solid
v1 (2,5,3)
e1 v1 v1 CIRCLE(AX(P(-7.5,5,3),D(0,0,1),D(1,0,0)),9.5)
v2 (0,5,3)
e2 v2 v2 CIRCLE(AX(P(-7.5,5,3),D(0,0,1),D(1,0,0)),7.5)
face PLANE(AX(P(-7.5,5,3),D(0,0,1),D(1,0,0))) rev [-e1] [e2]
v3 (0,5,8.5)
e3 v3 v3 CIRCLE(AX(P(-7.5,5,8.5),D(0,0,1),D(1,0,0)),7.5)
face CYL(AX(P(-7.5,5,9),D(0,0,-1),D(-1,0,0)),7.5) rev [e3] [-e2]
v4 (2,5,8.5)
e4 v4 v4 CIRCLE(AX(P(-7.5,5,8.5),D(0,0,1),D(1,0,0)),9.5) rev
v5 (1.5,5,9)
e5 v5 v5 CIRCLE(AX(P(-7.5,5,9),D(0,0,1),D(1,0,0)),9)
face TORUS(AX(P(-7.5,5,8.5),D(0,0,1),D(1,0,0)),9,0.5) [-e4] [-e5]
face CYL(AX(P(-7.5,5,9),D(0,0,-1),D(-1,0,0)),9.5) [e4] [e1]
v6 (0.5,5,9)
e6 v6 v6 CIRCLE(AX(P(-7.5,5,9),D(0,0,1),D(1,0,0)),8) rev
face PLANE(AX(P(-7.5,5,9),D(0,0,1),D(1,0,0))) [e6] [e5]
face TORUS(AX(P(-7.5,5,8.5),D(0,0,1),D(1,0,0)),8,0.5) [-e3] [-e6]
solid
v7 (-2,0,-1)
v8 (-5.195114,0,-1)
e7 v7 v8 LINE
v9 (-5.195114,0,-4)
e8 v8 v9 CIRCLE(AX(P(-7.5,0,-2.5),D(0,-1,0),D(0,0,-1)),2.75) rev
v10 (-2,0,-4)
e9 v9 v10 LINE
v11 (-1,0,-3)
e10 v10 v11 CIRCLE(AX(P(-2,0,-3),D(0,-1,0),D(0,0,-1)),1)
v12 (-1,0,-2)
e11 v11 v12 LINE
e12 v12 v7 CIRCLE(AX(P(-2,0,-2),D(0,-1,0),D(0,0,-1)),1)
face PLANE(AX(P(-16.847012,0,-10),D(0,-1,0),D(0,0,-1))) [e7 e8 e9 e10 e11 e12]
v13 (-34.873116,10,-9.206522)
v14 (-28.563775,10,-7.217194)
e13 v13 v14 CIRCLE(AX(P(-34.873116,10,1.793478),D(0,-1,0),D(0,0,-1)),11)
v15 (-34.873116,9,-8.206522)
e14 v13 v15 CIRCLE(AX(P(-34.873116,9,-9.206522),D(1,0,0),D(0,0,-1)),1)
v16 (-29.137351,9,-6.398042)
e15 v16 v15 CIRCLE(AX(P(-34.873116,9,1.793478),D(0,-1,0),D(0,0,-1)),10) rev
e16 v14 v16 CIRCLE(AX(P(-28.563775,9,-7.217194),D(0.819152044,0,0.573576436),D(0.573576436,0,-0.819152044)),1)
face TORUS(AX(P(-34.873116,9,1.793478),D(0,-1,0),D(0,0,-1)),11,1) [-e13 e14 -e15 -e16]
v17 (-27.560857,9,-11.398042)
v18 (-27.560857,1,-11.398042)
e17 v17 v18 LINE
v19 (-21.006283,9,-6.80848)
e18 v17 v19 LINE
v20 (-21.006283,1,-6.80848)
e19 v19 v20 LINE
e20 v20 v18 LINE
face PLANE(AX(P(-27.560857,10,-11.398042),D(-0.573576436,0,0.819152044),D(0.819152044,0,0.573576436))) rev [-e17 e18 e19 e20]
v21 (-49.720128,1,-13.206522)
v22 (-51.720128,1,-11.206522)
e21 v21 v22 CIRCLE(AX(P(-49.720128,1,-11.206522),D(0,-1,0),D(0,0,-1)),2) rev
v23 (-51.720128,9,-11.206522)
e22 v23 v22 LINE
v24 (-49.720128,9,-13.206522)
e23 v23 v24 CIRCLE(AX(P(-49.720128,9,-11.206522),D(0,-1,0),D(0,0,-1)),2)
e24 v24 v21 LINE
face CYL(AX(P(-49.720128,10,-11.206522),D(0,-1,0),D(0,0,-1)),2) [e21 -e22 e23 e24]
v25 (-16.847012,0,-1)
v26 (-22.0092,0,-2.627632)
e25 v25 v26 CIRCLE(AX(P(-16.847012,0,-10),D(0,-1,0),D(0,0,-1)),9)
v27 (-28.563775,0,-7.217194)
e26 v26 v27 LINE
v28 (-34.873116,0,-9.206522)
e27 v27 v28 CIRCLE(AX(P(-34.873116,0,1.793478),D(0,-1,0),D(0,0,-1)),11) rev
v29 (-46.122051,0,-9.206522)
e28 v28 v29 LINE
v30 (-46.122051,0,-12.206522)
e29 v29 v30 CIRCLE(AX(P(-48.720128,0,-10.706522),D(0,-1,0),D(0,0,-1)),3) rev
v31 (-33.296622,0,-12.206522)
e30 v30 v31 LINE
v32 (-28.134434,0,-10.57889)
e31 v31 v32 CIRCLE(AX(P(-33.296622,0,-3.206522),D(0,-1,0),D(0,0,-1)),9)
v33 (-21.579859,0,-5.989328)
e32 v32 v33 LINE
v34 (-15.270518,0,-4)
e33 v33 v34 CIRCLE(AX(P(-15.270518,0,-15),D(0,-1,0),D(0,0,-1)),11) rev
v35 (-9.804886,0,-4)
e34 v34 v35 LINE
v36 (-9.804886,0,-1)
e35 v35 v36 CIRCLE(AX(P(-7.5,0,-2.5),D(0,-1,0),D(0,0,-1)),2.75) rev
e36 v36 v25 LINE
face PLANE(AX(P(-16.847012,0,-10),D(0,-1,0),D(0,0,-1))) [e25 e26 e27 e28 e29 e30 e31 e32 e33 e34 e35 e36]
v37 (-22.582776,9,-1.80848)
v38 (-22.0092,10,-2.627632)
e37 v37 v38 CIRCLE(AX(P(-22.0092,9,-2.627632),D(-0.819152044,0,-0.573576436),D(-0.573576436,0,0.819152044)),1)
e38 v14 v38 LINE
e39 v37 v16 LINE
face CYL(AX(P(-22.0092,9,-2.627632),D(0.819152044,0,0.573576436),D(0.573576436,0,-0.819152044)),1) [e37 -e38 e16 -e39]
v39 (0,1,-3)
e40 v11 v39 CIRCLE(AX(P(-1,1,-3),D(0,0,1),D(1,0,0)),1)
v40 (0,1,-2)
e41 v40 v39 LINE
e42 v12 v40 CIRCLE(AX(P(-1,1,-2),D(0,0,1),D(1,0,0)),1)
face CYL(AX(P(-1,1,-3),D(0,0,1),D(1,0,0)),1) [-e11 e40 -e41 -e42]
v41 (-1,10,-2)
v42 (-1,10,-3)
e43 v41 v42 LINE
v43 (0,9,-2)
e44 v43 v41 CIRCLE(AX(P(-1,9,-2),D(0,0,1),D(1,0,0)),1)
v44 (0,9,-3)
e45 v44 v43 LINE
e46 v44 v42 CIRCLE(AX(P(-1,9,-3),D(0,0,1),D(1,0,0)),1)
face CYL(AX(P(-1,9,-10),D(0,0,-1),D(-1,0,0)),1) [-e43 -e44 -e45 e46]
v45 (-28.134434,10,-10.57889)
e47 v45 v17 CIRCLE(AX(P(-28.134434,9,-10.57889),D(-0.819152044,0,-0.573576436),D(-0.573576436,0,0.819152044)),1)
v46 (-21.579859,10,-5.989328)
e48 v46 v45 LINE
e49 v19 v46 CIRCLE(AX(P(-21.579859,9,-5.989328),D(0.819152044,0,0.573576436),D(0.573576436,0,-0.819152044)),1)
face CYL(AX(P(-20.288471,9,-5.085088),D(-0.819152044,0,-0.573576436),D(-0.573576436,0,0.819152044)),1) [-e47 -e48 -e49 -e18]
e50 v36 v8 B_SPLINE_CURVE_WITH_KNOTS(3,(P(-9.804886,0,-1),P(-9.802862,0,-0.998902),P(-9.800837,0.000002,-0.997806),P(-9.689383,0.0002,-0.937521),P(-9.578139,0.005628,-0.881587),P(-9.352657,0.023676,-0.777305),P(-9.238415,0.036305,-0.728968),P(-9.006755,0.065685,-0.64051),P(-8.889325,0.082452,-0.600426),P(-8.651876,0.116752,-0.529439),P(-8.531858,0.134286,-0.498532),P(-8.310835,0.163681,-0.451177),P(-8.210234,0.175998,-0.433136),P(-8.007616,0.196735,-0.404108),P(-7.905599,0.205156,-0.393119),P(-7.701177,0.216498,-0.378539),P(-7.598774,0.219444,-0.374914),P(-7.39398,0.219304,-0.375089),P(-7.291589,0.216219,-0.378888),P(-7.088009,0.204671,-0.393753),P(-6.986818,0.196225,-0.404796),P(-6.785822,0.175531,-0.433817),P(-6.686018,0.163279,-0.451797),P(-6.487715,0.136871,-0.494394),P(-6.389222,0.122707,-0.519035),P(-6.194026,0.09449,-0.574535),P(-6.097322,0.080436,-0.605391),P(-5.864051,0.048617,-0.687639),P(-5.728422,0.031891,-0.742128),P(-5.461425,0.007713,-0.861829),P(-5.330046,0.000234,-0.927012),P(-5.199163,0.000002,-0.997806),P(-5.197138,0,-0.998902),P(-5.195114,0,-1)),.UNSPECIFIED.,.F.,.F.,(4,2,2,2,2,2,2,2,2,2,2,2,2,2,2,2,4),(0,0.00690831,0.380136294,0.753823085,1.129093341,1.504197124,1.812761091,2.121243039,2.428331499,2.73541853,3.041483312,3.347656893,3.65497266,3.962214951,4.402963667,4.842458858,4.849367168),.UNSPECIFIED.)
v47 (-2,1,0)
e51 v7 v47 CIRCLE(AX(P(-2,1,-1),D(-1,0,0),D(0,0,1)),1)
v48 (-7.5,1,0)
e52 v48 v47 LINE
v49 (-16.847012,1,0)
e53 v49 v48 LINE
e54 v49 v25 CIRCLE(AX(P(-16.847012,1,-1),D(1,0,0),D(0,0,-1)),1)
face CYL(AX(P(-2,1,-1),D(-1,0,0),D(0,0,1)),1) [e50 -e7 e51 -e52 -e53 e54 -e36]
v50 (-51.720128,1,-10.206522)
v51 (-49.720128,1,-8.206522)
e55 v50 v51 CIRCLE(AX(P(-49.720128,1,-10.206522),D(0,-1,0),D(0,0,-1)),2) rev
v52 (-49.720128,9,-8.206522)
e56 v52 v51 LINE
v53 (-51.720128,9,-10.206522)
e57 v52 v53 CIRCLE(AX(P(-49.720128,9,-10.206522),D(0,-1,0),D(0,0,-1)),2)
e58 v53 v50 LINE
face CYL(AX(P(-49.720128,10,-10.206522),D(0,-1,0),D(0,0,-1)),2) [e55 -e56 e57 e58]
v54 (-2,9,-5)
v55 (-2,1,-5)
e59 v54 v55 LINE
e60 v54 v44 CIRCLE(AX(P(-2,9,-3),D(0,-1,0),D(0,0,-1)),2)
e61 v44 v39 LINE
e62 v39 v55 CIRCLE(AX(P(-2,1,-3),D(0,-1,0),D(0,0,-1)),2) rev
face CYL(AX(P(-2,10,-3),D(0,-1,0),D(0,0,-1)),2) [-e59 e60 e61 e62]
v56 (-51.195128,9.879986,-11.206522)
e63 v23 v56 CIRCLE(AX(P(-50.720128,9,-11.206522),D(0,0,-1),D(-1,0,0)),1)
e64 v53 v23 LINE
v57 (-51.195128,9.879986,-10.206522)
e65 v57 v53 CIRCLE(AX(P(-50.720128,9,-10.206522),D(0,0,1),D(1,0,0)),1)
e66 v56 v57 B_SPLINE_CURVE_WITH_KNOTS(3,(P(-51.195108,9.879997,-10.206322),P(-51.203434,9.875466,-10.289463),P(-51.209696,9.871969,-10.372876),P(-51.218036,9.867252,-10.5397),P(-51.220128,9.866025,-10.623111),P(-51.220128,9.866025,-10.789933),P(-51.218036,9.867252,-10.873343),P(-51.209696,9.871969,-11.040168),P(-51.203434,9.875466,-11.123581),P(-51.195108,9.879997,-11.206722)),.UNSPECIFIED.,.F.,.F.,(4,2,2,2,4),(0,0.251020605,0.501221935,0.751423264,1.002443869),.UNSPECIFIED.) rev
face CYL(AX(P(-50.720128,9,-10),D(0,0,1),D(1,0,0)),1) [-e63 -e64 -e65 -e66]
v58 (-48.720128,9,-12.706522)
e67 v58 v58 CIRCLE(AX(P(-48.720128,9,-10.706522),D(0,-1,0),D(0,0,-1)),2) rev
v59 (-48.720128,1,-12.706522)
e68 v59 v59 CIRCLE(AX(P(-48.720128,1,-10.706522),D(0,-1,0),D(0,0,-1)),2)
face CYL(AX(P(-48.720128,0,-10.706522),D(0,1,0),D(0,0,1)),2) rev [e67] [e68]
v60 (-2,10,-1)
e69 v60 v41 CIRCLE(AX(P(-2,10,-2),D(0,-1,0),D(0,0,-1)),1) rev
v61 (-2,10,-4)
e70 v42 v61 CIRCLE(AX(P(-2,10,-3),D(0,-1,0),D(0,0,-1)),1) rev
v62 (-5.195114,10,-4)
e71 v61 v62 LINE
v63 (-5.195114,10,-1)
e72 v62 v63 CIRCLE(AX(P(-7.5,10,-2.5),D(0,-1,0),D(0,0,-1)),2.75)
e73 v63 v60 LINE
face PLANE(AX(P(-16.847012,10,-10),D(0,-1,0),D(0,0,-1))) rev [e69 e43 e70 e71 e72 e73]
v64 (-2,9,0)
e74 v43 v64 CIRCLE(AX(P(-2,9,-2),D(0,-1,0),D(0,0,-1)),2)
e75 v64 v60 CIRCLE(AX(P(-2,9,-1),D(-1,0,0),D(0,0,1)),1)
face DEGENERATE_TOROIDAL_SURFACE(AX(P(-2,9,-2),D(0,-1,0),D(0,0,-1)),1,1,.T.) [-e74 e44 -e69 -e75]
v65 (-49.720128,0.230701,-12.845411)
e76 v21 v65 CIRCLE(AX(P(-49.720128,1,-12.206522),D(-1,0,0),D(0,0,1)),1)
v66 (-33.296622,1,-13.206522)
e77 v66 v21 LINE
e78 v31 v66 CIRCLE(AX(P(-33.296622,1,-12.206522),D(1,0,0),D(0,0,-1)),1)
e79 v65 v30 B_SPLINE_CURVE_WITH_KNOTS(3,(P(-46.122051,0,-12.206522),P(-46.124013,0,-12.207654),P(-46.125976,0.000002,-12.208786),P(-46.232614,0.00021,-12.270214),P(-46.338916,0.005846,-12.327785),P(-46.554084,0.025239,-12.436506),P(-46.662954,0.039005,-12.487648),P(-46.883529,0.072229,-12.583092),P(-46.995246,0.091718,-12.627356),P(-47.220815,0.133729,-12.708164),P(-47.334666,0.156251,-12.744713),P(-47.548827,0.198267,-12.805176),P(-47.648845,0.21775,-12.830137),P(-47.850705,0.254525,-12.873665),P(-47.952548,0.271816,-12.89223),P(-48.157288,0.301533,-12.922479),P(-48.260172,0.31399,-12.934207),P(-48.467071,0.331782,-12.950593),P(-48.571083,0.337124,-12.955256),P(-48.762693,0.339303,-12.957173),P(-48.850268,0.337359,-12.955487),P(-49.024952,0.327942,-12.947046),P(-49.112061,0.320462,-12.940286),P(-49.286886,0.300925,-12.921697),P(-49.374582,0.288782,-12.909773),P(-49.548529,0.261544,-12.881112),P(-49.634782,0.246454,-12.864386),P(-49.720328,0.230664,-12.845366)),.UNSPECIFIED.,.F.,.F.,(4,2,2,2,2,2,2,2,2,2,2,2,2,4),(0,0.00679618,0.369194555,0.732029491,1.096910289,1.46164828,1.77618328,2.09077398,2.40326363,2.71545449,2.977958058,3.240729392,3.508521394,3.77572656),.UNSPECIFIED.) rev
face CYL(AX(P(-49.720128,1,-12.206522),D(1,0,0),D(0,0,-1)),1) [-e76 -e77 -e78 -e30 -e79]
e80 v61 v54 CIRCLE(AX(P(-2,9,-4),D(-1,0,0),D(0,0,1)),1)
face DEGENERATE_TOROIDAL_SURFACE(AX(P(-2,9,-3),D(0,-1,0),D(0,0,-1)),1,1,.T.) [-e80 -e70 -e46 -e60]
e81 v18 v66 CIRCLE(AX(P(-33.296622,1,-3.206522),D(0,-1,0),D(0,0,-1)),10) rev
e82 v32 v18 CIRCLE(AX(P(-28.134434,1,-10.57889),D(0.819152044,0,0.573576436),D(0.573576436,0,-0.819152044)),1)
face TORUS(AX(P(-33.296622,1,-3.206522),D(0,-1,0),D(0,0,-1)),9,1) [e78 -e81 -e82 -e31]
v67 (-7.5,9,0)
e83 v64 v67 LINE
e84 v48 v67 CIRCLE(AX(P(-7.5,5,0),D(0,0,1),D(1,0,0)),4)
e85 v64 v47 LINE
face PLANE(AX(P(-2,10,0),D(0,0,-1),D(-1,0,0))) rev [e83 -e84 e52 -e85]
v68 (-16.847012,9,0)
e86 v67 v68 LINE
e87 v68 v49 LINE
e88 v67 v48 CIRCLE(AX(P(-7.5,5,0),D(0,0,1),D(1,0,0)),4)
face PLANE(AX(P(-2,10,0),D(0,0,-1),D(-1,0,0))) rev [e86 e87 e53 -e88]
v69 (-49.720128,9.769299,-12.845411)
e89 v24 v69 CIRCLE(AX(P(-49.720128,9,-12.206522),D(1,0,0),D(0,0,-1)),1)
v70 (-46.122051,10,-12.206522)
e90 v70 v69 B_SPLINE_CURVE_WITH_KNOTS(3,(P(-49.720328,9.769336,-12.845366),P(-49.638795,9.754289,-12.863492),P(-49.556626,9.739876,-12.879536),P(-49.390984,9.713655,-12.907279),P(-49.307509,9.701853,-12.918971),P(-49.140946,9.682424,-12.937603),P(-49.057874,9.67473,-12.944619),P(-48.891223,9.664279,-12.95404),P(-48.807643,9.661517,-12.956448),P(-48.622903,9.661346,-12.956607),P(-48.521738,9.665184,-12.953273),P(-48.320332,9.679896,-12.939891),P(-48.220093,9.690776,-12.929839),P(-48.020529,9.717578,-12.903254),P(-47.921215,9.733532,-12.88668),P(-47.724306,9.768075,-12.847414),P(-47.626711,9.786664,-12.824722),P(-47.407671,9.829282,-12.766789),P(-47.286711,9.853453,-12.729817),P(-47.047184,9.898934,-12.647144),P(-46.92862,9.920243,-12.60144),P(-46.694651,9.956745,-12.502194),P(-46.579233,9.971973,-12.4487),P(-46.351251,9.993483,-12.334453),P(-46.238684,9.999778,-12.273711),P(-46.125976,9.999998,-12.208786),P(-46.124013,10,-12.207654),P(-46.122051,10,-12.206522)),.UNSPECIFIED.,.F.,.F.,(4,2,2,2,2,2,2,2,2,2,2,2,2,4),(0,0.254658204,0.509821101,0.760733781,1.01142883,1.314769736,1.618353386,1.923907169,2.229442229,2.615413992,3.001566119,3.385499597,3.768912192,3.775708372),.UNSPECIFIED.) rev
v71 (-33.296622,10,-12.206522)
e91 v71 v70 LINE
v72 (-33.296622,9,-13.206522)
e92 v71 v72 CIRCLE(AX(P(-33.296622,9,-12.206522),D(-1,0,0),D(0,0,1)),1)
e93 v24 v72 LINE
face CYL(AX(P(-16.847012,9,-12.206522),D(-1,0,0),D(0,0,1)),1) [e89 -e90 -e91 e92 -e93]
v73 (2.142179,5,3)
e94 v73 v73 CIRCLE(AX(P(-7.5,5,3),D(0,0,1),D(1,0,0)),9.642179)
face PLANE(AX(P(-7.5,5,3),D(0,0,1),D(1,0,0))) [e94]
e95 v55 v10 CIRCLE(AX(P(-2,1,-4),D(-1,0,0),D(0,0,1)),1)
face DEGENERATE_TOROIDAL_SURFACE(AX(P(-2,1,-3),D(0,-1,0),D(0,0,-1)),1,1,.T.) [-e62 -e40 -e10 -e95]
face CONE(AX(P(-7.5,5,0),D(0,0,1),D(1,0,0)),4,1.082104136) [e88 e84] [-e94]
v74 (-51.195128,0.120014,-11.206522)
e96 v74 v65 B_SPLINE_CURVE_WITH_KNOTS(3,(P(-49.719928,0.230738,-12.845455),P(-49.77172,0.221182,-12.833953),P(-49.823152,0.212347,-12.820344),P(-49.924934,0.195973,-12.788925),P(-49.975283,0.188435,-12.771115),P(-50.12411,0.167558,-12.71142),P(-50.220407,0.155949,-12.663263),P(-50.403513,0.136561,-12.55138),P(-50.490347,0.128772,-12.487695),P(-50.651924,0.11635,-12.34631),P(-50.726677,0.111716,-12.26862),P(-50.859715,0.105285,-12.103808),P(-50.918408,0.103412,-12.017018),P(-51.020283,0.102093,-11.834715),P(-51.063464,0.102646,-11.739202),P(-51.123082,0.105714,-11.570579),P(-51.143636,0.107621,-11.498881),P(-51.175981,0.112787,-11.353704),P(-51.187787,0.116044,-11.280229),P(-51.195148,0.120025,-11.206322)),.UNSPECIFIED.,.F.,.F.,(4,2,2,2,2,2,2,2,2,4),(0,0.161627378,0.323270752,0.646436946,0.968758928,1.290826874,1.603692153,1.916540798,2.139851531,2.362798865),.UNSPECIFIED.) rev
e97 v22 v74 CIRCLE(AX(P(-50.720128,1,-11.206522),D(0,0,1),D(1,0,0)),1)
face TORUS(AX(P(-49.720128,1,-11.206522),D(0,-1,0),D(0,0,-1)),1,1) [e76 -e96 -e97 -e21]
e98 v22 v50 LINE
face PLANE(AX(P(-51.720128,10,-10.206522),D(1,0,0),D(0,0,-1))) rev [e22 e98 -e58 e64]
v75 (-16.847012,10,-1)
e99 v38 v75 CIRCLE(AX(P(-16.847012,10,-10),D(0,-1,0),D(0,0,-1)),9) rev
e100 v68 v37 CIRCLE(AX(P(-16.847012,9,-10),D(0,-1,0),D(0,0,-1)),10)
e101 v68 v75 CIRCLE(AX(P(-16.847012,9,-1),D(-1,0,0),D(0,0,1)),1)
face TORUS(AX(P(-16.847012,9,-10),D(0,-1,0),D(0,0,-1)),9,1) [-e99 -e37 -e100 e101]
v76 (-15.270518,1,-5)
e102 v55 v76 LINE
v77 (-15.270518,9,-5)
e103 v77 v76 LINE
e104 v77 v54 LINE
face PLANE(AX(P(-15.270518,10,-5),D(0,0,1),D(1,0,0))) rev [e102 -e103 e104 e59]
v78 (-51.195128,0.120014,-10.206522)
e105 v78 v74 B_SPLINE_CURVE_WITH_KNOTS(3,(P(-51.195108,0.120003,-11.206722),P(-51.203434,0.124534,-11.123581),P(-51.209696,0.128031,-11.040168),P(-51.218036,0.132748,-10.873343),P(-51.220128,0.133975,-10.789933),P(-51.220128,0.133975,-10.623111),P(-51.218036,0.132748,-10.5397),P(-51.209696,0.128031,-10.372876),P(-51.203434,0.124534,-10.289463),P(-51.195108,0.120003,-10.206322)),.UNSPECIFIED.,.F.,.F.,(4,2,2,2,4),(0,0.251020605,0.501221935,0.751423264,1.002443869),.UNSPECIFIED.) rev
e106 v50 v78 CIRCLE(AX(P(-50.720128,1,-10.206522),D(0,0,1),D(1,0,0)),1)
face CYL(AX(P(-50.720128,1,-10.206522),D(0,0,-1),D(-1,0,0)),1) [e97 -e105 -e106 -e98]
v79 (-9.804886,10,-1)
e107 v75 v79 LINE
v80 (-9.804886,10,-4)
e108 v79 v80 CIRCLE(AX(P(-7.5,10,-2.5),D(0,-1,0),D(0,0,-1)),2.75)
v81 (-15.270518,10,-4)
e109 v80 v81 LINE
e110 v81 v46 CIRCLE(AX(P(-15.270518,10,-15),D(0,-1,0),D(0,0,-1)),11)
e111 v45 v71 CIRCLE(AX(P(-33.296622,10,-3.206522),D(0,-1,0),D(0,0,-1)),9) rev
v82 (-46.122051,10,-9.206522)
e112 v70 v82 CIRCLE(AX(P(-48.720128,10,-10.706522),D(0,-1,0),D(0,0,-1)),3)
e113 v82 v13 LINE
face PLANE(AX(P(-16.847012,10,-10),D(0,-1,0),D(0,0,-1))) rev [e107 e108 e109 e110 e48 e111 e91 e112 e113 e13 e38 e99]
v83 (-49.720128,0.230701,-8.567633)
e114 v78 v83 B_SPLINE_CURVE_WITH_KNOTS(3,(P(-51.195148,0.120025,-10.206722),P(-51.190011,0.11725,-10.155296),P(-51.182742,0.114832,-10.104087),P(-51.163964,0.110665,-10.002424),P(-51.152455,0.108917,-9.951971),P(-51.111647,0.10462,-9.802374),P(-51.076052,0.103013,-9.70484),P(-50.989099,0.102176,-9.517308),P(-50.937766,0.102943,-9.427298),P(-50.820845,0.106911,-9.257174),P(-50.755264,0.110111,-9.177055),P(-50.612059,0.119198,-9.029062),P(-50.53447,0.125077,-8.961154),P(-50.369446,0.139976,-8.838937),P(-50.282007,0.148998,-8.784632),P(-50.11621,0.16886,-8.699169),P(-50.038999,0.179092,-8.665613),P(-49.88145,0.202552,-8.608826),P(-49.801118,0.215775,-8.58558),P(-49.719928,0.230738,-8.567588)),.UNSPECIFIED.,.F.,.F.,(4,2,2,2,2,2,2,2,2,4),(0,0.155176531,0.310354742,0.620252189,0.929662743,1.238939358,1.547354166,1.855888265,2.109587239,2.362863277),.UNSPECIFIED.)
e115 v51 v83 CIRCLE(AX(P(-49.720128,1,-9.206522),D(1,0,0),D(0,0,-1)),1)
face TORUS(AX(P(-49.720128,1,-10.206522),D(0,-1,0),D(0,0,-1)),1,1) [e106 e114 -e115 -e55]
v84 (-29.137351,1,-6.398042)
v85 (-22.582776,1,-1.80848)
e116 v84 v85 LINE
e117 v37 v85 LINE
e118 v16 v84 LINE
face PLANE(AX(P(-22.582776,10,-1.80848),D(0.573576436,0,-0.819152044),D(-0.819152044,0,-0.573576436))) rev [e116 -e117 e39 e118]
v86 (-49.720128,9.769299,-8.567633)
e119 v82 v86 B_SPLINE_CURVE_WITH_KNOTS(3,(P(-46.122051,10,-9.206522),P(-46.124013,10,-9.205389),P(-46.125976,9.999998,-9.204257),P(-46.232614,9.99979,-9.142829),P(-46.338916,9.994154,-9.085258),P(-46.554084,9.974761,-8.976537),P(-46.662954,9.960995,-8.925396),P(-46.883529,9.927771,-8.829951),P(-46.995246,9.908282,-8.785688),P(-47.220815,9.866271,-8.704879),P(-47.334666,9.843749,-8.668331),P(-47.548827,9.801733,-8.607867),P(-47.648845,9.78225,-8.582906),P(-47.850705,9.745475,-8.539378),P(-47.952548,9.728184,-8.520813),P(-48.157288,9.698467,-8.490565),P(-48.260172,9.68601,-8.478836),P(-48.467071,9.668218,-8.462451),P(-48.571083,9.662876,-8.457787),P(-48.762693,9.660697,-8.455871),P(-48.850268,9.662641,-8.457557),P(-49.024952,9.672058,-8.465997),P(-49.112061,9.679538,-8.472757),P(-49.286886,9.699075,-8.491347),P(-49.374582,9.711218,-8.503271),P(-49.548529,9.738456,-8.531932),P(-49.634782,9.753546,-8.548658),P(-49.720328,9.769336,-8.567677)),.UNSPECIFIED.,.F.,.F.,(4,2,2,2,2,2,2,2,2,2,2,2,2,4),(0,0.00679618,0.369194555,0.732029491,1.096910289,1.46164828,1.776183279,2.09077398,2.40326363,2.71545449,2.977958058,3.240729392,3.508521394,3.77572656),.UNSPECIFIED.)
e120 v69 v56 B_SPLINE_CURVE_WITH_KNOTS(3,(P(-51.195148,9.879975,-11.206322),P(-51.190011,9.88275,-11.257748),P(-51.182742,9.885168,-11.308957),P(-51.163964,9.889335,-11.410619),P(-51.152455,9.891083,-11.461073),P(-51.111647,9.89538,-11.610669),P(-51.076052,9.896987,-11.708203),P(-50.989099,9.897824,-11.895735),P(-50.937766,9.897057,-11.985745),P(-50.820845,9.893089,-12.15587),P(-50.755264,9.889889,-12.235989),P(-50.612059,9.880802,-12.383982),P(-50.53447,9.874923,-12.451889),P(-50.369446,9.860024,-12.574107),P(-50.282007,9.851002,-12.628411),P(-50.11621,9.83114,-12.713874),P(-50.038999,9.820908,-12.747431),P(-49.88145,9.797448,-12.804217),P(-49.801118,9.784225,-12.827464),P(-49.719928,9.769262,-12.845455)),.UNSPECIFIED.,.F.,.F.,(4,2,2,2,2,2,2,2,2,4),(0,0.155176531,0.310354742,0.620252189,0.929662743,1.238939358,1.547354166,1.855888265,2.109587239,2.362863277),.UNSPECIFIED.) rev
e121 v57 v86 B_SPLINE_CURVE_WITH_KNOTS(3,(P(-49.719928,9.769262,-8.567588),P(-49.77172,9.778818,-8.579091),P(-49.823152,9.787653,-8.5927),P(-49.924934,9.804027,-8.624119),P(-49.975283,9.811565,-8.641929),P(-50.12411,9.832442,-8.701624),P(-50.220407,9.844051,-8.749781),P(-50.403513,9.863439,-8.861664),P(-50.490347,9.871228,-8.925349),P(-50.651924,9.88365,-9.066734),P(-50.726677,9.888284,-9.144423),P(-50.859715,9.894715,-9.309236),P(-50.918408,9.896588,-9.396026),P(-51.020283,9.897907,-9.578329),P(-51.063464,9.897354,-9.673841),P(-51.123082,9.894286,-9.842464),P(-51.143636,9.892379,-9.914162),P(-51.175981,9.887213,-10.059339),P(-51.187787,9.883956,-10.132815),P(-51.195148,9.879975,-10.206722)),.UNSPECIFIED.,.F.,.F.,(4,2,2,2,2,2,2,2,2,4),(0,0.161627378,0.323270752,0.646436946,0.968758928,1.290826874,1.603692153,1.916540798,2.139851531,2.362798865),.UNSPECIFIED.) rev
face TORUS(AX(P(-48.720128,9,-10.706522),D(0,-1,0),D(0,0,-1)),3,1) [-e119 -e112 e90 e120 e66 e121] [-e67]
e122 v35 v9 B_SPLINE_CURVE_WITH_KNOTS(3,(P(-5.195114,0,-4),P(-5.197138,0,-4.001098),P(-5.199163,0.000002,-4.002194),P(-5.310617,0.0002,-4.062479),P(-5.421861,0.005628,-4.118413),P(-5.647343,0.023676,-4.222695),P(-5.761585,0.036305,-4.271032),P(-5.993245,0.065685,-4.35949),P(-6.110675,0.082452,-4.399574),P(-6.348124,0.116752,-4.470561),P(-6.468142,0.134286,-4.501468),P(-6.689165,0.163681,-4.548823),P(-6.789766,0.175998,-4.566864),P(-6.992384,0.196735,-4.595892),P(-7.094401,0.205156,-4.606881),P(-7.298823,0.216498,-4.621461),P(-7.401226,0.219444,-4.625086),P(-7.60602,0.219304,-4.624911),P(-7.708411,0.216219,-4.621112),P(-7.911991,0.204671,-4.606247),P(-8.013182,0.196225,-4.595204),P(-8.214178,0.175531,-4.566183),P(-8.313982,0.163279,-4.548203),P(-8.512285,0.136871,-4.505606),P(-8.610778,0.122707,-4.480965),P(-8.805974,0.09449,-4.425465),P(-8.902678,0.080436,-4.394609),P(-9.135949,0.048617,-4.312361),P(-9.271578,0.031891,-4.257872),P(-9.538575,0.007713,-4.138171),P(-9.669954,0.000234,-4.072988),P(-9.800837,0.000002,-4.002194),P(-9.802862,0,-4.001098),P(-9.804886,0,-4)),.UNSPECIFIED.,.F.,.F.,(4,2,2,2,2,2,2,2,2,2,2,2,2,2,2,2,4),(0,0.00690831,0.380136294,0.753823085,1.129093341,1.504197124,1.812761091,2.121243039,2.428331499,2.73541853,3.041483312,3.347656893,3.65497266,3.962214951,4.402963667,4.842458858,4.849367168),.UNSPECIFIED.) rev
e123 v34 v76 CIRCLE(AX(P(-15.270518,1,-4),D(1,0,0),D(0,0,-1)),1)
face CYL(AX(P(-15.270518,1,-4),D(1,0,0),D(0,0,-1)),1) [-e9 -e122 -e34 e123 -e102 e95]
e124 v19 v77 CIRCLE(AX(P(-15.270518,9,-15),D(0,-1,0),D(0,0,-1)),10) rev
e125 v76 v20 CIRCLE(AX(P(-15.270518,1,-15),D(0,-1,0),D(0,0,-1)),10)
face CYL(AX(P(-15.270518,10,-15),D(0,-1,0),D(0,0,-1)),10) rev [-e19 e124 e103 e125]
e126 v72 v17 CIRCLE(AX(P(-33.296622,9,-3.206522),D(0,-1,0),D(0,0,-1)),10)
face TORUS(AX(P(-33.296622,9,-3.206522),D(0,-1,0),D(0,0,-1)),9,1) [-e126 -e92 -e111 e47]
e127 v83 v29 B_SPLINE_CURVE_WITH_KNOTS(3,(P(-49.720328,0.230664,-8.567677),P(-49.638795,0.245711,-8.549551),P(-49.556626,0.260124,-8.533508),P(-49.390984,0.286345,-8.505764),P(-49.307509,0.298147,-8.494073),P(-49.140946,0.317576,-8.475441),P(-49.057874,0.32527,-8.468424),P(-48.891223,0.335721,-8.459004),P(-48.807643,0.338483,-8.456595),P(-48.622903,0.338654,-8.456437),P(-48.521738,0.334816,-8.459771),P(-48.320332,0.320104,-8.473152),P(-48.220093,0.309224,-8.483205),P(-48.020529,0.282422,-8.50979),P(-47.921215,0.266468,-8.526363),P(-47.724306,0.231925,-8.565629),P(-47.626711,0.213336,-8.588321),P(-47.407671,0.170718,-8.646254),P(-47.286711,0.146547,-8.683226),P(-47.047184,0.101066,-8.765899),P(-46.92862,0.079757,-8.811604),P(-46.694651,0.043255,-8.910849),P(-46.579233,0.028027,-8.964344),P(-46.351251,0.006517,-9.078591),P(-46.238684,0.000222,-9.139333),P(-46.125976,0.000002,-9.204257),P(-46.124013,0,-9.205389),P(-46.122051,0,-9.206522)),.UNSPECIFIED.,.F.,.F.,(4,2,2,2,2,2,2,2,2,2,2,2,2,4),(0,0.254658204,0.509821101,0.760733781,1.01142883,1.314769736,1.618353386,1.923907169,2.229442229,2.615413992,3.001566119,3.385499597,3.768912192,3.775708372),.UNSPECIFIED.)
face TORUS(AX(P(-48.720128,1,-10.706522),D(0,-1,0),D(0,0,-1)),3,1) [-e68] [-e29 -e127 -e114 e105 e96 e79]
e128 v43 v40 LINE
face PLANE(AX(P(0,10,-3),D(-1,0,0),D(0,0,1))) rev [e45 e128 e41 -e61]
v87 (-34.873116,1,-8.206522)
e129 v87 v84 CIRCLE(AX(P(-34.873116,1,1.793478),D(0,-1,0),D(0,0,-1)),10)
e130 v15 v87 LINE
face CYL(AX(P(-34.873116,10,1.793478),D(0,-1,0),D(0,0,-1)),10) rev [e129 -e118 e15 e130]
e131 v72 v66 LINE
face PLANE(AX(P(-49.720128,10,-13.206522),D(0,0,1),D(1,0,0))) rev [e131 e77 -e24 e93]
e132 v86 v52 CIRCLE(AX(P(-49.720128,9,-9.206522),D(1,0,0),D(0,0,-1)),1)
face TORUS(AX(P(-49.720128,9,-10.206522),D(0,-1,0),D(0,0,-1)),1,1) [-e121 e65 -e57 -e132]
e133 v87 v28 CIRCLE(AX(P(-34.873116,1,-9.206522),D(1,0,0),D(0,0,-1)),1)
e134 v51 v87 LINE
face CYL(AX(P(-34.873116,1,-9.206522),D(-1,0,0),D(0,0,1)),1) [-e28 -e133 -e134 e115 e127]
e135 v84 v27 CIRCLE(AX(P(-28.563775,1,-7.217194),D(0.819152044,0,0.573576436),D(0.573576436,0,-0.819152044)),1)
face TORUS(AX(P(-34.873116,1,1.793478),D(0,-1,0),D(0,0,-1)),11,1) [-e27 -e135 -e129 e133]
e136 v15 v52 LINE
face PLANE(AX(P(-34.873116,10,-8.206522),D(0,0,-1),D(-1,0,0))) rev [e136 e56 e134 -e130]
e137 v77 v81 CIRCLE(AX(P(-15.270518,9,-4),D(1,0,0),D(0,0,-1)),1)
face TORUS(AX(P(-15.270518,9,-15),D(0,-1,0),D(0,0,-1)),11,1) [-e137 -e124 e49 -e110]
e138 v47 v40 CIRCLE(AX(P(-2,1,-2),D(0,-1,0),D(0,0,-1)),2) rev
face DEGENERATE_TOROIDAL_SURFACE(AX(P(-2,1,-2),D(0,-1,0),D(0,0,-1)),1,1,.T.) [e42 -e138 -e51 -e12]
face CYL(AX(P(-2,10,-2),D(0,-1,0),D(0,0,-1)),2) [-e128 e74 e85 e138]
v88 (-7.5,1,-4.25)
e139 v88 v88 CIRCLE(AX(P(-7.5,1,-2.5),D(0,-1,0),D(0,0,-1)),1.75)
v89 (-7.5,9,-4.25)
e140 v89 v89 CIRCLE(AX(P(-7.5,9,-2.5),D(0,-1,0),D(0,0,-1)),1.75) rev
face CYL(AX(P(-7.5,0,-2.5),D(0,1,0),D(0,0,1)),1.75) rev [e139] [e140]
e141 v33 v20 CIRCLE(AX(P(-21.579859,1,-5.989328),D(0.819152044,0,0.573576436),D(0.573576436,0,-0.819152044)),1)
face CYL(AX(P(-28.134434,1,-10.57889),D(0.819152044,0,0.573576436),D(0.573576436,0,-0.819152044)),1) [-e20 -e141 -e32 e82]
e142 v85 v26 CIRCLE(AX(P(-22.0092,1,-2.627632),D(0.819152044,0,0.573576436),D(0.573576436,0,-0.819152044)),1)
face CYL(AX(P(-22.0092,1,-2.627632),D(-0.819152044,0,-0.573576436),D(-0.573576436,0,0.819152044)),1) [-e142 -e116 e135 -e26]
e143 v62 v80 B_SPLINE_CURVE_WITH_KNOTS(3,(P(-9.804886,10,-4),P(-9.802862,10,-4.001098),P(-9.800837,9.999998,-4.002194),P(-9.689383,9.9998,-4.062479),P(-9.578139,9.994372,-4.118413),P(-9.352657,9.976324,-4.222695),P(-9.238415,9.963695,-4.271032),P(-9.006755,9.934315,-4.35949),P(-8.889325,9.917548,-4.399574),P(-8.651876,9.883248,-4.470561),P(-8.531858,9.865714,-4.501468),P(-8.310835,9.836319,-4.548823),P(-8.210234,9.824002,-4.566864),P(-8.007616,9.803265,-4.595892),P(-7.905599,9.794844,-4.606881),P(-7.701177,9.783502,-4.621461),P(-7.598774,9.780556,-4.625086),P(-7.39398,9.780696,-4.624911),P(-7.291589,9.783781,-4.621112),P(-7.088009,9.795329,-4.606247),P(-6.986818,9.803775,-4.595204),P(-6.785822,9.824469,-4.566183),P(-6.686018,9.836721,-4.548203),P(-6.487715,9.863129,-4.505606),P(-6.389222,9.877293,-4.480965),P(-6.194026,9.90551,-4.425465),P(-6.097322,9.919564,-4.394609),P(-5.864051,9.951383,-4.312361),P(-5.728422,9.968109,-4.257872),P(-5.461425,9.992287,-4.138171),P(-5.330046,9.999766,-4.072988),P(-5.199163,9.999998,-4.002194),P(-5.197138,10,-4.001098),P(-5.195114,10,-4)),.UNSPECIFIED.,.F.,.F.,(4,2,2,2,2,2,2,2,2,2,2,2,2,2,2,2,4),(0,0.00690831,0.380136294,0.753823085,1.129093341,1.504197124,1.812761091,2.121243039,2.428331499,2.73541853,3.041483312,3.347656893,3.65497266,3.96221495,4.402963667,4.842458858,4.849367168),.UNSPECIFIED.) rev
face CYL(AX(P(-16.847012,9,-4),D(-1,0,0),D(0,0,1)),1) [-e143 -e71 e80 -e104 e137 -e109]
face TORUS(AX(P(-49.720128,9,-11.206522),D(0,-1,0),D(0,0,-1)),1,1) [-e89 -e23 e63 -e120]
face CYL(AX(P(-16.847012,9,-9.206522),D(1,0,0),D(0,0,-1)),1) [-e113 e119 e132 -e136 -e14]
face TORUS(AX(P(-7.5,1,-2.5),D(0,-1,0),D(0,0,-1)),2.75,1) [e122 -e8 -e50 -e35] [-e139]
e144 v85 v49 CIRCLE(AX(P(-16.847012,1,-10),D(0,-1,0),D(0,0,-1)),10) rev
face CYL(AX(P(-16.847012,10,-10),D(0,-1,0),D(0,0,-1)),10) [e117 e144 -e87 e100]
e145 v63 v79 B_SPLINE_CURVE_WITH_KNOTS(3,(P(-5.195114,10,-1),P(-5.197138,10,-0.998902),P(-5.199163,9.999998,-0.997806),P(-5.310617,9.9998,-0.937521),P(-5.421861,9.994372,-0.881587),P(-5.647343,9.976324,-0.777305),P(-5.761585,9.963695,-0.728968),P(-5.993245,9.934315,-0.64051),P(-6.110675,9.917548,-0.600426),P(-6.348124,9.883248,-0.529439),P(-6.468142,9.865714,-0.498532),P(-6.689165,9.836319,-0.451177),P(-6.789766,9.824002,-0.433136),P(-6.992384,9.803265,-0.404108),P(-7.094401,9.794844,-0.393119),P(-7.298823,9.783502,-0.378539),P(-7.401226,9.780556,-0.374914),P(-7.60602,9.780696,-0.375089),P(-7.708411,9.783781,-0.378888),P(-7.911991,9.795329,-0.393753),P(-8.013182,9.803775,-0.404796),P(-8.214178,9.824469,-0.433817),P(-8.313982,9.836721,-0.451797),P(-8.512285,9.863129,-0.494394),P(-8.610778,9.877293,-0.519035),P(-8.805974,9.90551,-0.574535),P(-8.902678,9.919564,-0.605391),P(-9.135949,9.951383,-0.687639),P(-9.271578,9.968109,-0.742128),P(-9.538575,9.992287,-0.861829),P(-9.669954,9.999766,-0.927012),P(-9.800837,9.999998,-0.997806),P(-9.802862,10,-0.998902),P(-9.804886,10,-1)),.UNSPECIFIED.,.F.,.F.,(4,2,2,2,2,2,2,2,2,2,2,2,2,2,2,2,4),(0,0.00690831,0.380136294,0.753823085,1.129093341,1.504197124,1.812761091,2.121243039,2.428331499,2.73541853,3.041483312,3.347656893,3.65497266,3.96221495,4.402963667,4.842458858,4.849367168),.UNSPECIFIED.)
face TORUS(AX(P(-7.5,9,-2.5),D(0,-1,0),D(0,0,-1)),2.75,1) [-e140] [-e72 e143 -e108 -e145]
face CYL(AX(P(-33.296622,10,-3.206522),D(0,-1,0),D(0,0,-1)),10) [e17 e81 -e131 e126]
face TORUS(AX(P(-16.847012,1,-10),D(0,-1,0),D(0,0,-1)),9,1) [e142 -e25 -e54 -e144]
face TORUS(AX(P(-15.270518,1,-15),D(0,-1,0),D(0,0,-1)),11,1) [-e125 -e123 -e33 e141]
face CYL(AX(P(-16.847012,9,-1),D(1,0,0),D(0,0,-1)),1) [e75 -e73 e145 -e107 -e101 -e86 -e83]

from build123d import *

# Parameters (mm, degrees)
BOSS_EXTRUDE1_DEPTH = 10
SKETCH2_R           = 1.75
SKETCH2_R_2         = 2
CUT_EXTRUDE1_DEPTH  = 10
FILLET2_R           = 1
SKETCH4_R           = 4
BOSS_EXTRUDE3_DEPTH = 3
BOSS_EXTRUDE3_DRAFT = -62
SKETCH3_R           = 9.5
SKETCH3_R_2         = 7.5
BOSS_EXTRUDE2_DEPTH = 6
FILLET4_R           = 0.5


with BuildPart() as part:
    # Sketch1 → Boss-Extrude1 (new body)
    with BuildSketch(Plane(origin=(0, 0, 0), x_dir=(1, 0, 0), z_dir=(0, 1, 0))):
        with BuildLine():
            Line((-2, 0), (-16.847012111, 0))
            ThreePointArc((-16.847012111, 0), (-19.854070106, 0.462830493), (-22.582776475, 1.808479557))
            Line((-22.582776475, 1.808479557), (-29.137351189, 6.398042182))
            ThreePointArc((-29.137351189, 6.398042182), (-31.866057558, 7.743691247), (-34.873115553, 8.206521739))
            Line((-34.873115553, 8.206521739), (-49.720127664, 8.206521739))
            ThreePointArc((-49.720127664, 8.206521739), (-51.134341226, 8.792308177), (-51.720127664, 10.206521739))
            Line((-51.720127664, 10.206521739), (-51.720127664, 11.206521739))
            ThreePointArc((-51.720127664, 11.206521739), (-51.134341226, 12.620735302), (-49.720127664, 13.206521739))
            Line((-49.720127664, 13.206521739), (-33.296621608, 13.206521739))
            ThreePointArc((-33.296621608, 13.206521739), (-30.289563613, 12.743691247), (-27.560857245, 11.398042182))
            Line((-27.560857245, 11.398042182), (-21.00628253, 6.808479557))
            ThreePointArc((-21.00628253, 6.808479557), (-18.277576162, 5.462830493), (-15.270518167, 5))
            Line((-15.270518167, 5), (-2, 5))
            ThreePointArc((-2, 5), (-0.585786438, 4.414213562), (0, 3))
            Line((0, 3), (0, 2))
            ThreePointArc((0, 2), (-0.585786438, 0.585786438), (-2, 0))
        make_face()
    extrude(amount=BOSS_EXTRUDE1_DEPTH)

    # Sketch2 → Cut-Extrude1 (cut)
    with BuildSketch(Plane(origin=(0, 10, 0), x_dir=(1, 0, 0), z_dir=(0, 1, 0))):
        with Locations(Location((-7.5, 2.5, 0), (0, 0, 270))):
            Circle(SKETCH2_R)
        with Locations(Location((-48.720127664, 10.706521739, 0), (0, 0, 270))):
            Circle(SKETCH2_R_2)
    extrude(amount=-CUT_EXTRUDE1_DEPTH, mode=Mode.SUBTRACT)

    # Fillet2
    # the kernel refuses this fillet: 1 mm, written as the material it takes off along each edge
    with BuildSketch(Plane(origin=(-2, 10, -2), x_dir=(1, 0, 0), z_dir=(0, 0, -1))) as fillet2_piece_1:
        with BuildLine():
            CenterArc((2 - FILLET2_R, FILLET2_R), FILLET2_R, 270, 90)
            Line((2, FILLET2_R), (2, 0))
            Line((2, 0), (2 - FILLET2_R, 0))
        make_face()
    revolve(axis=Axis((-2, 10, -2), (0, -1, 0)), revolution_arc=90, mode=Mode.SUBTRACT)
    with BuildSketch(Plane(origin=(-22.582776475, 0, -1.808479557), x_dir=(0.5735764363510469, 0, -0.8191520442889912), z_dir=(-0.8191520442889912, 0, -0.5735764363510469)), Plane(origin=(-27.560857245, 10, -11.398042182), x_dir=(0, -1, 0), z_dir=(0.8191520442889902, 0, 0.5735764363510484))) as fillet2_piece_2:
        with BuildLine():
            CenterArc((FILLET2_R, -FILLET2_R), FILLET2_R, 90, 90)
            Line((0, -FILLET2_R), (0, 0))
            Line((0, 0), (FILLET2_R, 0))
        make_face()
    extrude(amount=8.001658252, mode=Mode.SUBTRACT)
    with BuildSketch(Plane(origin=(-34.873115553, 0, 1.793478261), x_dir=(0.5735764363510476, 0, -0.8191520442889908), z_dir=(0.8191520442889908, 0, 0.5735764363510476))) as fillet2_piece_3:
        with BuildLine():
            CenterArc((10 + FILLET2_R, FILLET2_R), FILLET2_R, 180, 90)
            Line((10, FILLET2_R), (10, 0))
            Line((10, 0), (10 + FILLET2_R, 0))
        make_face()
    revolve(axis=Axis((-34.873115553, 0, 1.793478261), (0, 1, 0)), revolution_arc=35, mode=Mode.SUBTRACT)
    with BuildSketch(Plane(origin=(-34.873115553, 0, -8.206521739), x_dir=(0, 0, -1), z_dir=(-1, 0, 0)), Plane(origin=(-2, 0, 0), x_dir=(0, 0, -1), z_dir=(-1, 0, 0))) as fillet2_piece_4:
        with BuildLine():
            CenterArc((FILLET2_R, -FILLET2_R), FILLET2_R, 90, 90)
            Line((0, -FILLET2_R), (0, 0))
            Line((0, 0), (FILLET2_R, 0))
        make_face()
    extrude(amount=14.847012111, mode=Mode.SUBTRACT)
    with BuildSketch(Plane(origin=(0, 10, -3), x_dir=(-1, 0, 0), z_dir=(0, 0, 1)), Plane(origin=(-51.720127664, 10, -10.206521739), x_dir=(1, 0, 0), z_dir=(0, 0, -1))) as fillet2_piece_5:
        with BuildLine():
            CenterArc((FILLET2_R, FILLET2_R), FILLET2_R, 180, 90)
            Line((0, FILLET2_R), (0, 0))
            Line((0, 0), (FILLET2_R, 0))
        make_face()
    extrude(amount=1, mode=Mode.SUBTRACT)
    with BuildSketch(Plane(origin=(-49.720127664, 0, -10.206521739), x_dir=(0, 0, 1), z_dir=(1, 0, 0))) as fillet2_piece_6:
        with BuildLine():
            CenterArc((2 - FILLET2_R, -FILLET2_R), FILLET2_R, 0, 90)
            Line((2, -FILLET2_R), (2, 0))
            Line((2, 0), (2 - FILLET2_R, 0))
        make_face()
    revolve(axis=Axis((-49.720127664, 0, -10.206521739), (0, -1, 0)), revolution_arc=90, mode=Mode.SUBTRACT)
    with BuildSketch(Plane(origin=(-51.720127664, 0, -10.206521739), x_dir=(1, 0, 0), z_dir=(0, 0, -1)), Plane(origin=(0, 0, -3), x_dir=(-1, 0, 0), z_dir=(0, 0, 1))) as fillet2_piece_7:
        with BuildLine():
            CenterArc((FILLET2_R, -FILLET2_R), FILLET2_R, 90, 90)
            Line((0, -FILLET2_R), (0, 0))
            Line((0, 0), (FILLET2_R, 0))
        make_face()
    extrude(amount=1, mode=Mode.SUBTRACT)
    with BuildSketch(Plane(origin=(-49.720127664, 0, -11.206521739), x_dir=(-1, 0, 0), z_dir=(0, 0, 1))) as fillet2_piece_8:
        with BuildLine():
            CenterArc((2 - FILLET2_R, -FILLET2_R), FILLET2_R, 0, 90)
            Line((2, -FILLET2_R), (2, 0))
            Line((2, 0), (2 - FILLET2_R, 0))
        make_face()
    revolve(axis=Axis((-49.720127664, 0, -11.206521739), (0, -1, 0)), revolution_arc=90, mode=Mode.SUBTRACT)
    with BuildSketch(Plane(origin=(-49.720127664, 0, -13.206521739), x_dir=(0, 0, 1), z_dir=(1, 0, 0))) as fillet2_piece_9:
        with BuildLine():
            CenterArc((FILLET2_R, -FILLET2_R), FILLET2_R, 90, 90)
            Line((0, -FILLET2_R), (0, 0))
            Line((0, 0), (FILLET2_R, 0))
        make_face()
    extrude(amount=16.423506056, mode=Mode.SUBTRACT)
    with BuildSketch(Plane(origin=(-33.296621608, 0, -3.206521739), x_dir=(0, 0, -1), z_dir=(-1, 0, 0))) as fillet2_piece_10:
        with BuildLine():
            CenterArc((10 - FILLET2_R, -FILLET2_R), FILLET2_R, 0, 90)
            Line((10 - FILLET2_R, 0), (10, 0))
            Line((10, 0), (10, -FILLET2_R))
        make_face()
    revolve(axis=Axis((-33.296621608, 0, -3.206521739), (0, -1, 0)), revolution_arc=35, mode=Mode.SUBTRACT)
    with BuildSketch(Plane(origin=(-27.560857245, 0, -11.398042182), x_dir=(0, 1, 0), z_dir=(0.8191520442889902, 0, 0.5735764363510484)), Plane(origin=(-22.582776475, 10, -1.808479557), x_dir=(0.5735764363510469, 0, -0.8191520442889912), z_dir=(-0.8191520442889912, 0, -0.5735764363510469))) as fillet2_piece_11:
        with BuildLine():
            CenterArc((FILLET2_R, FILLET2_R), FILLET2_R, 180, 90)
            Line((0, FILLET2_R), (0, 0))
            Line((0, 0), (FILLET2_R, 0))
        make_face()
    extrude(amount=8.001658252, mode=Mode.SUBTRACT)
    with BuildSketch(Plane(origin=(-15.270518167, 0, -15), x_dir=(-0.573576436351048, 0, 0.8191520442889905), z_dir=(-0.8191520442889905, 0, -0.573576436351048))) as fillet2_piece_12:
        with BuildLine():
            CenterArc((10 + FILLET2_R, FILLET2_R), FILLET2_R, 180, 90)
            Line((10 + FILLET2_R, 0), (10, 0))
            Line((10, 0), (10, FILLET2_R))
        make_face()
    revolve(axis=Axis((-15.270518167, 0, -15), (0, 1, 0)), revolution_arc=35, mode=Mode.SUBTRACT)
    with BuildSketch(Plane(origin=(-15.270518167, 0, -5), x_dir=(0, 0, 1), z_dir=(1, 0, 0))) as fillet2_piece_13:
        with BuildLine():
            CenterArc((FILLET2_R, -FILLET2_R), FILLET2_R, 90, 90)
            Line((0, -FILLET2_R), (0, 0))
            Line((0, 0), (FILLET2_R, 0))
        make_face()
    extrude(amount=13.270518167, mode=Mode.SUBTRACT)
    with BuildSketch(Plane(origin=(-2, 0, -3), x_dir=(0, 0, -1), z_dir=(-1, 0, 0))) as fillet2_piece_14:
        with BuildLine():
            CenterArc((2 - FILLET2_R, -FILLET2_R), FILLET2_R, 0, 90)
            Line((2, -FILLET2_R), (2, 0))
            Line((2, 0), (2 - FILLET2_R, 0))
        make_face()
    revolve(axis=Axis((-2, 0, -3), (0, -1, 0)), revolution_arc=90, mode=Mode.SUBTRACT)
    with BuildSketch(Plane(origin=(-2, 10, -3), x_dir=(0, 0, -1), z_dir=(-1, 0, 0))) as fillet2_piece_15:
        with BuildLine():
            CenterArc((2 - FILLET2_R, FILLET2_R), FILLET2_R, 270, 90)
            Line((2, FILLET2_R), (2, 0))
            Line((2, 0), (2 - FILLET2_R, 0))
        make_face()
    revolve(axis=Axis((-2, 10, -3), (0, -1, 0)), revolution_arc=90, mode=Mode.SUBTRACT)
    with BuildSketch(Plane(origin=(-2, 0, -2), x_dir=(1, 0, 0), z_dir=(0, 0, -1))) as fillet2_piece_16:
        with BuildLine():
            CenterArc((2 - FILLET2_R, -FILLET2_R), FILLET2_R, 0, 90)
            Line((2, -FILLET2_R), (2, 0))
            Line((2, 0), (2 - FILLET2_R, 0))
        make_face()
    revolve(axis=Axis((-2, 0, -2), (0, -1, 0)), revolution_arc=90, mode=Mode.SUBTRACT)
    with BuildSketch(Plane(origin=(-16.847012111, 0, -10), x_dir=(0, 0, 1), z_dir=(1, 0, 0))) as fillet2_piece_17:
        with BuildLine():
            CenterArc((10 - FILLET2_R, -FILLET2_R), FILLET2_R, 0, 90)
            Line((10, -FILLET2_R), (10, 0))
            Line((10, 0), (10 - FILLET2_R, 0))
        make_face()
    revolve(axis=Axis((-16.847012111, 0, -10), (0, -1, 0)), revolution_arc=35, mode=Mode.SUBTRACT)
    with BuildSketch(Plane(origin=(-15.270518167, 10, -5), x_dir=(0, 0, 1), z_dir=(1, 0, 0))) as fillet2_piece_18:
        with BuildLine():
            CenterArc((FILLET2_R, FILLET2_R), FILLET2_R, 180, 90)
            Line((0, FILLET2_R), (0, 0))
            Line((0, 0), (FILLET2_R, 0))
        make_face()
    extrude(amount=13.270518167, mode=Mode.SUBTRACT)
    with BuildSketch(Plane(origin=(-15.270518167, 10, -15), x_dir=(-0.573576436351048, 0, 0.8191520442889905), z_dir=(-0.8191520442889905, 0, -0.573576436351048))) as fillet2_piece_19:
        with BuildLine():
            CenterArc((10 + FILLET2_R, -FILLET2_R), FILLET2_R, 90, 90)
            Line((10 + FILLET2_R, 0), (10, 0))
            Line((10, 0), (10, -FILLET2_R))
        make_face()
    revolve(axis=Axis((-15.270518167, 10, -15), (0, 1, 0)), revolution_arc=35, mode=Mode.SUBTRACT)
    with BuildSketch(Plane(origin=(-33.296621608, 10, -3.206521739), x_dir=(0, 0, -1), z_dir=(-1, 0, 0))) as fillet2_piece_20:
        with BuildLine():
            CenterArc((10 - FILLET2_R, FILLET2_R), FILLET2_R, 270, 90)
            Line((10 - FILLET2_R, 0), (10, 0))
            Line((10, 0), (10, FILLET2_R))
        make_face()
    revolve(axis=Axis((-33.296621608, 10, -3.206521739), (0, -1, 0)), revolution_arc=35, mode=Mode.SUBTRACT)
    with BuildSketch(Plane(origin=(-49.720127664, 10, -13.206521739), x_dir=(0, 0, 1), z_dir=(1, 0, 0))) as fillet2_piece_21:
        with BuildLine():
            CenterArc((FILLET2_R, FILLET2_R), FILLET2_R, 180, 90)
            Line((0, FILLET2_R), (0, 0))
            Line((0, 0), (FILLET2_R, 0))
        make_face()
    extrude(amount=16.423506056, mode=Mode.SUBTRACT)
    with BuildSketch(Plane(origin=(-49.720127664, 10, -11.206521739), x_dir=(-1, 0, 0), z_dir=(0, 0, 1))) as fillet2_piece_22:
        with BuildLine():
            CenterArc((2 - FILLET2_R, FILLET2_R), FILLET2_R, 270, 90)
            Line((2, FILLET2_R), (2, 0))
            Line((2, 0), (2 - FILLET2_R, 0))
        make_face()
    revolve(axis=Axis((-49.720127664, 10, -11.206521739), (0, -1, 0)), revolution_arc=90, mode=Mode.SUBTRACT)
    with BuildSketch(Plane(origin=(-16.847012111, 10, -10), x_dir=(0, 0, 1), z_dir=(1, 0, 0))) as fillet2_piece_23:
        with BuildLine():
            CenterArc((10 - FILLET2_R, FILLET2_R), FILLET2_R, 270, 90)
            Line((10, FILLET2_R), (10, 0))
            Line((10, 0), (10 - FILLET2_R, 0))
        make_face()
    revolve(axis=Axis((-16.847012111, 10, -10), (0, -1, 0)), revolution_arc=35, mode=Mode.SUBTRACT)
    with BuildSketch(Plane(origin=(-7.5, 0, -2.5), x_dir=(0, 0, 1), z_dir=(-1, 0, 0))) as fillet2_piece_24:
        with BuildLine():
            CenterArc((1.75 + FILLET2_R, FILLET2_R), FILLET2_R, 180, 90)
            Line((1.75, FILLET2_R), (1.75, 0))
            Line((1.75, 0), (1.75 + FILLET2_R, 0))
        make_face()
    revolve(axis=Axis((-7.5, 0, -2.5), (0, 1, 0)), mode=Mode.SUBTRACT)
    with BuildSketch(Plane(origin=(-7.5, 10, -2.5), x_dir=(0, 0, 1), z_dir=(-1, 0, 0))) as fillet2_piece_25:
        with BuildLine():
            CenterArc((1.75 + FILLET2_R, -FILLET2_R), FILLET2_R, 90, 90)
            Line((1.75, -FILLET2_R), (1.75, 0))
            Line((1.75, 0), (1.75 + FILLET2_R, 0))
        make_face()
    revolve(axis=Axis((-7.5, 10, -2.5), (0, 1, 0)), mode=Mode.SUBTRACT)
    with BuildSketch(Plane(origin=(-49.720127664, 10, -10.206521739), x_dir=(0, 0, 1), z_dir=(1, 0, 0))) as fillet2_piece_26:
        with BuildLine():
            CenterArc((2 - FILLET2_R, FILLET2_R), FILLET2_R, 270, 90)
            Line((2, FILLET2_R), (2, 0))
            Line((2, 0), (2 - FILLET2_R, 0))
        make_face()
    revolve(axis=Axis((-49.720127664, 10, -10.206521739), (0, -1, 0)), revolution_arc=90, mode=Mode.SUBTRACT)
    with BuildSketch(Plane(origin=(-48.720127664, 0, -10.706521739), x_dir=(0, 0, 1), z_dir=(-1, 0, 0))) as fillet2_piece_27:
        with BuildLine():
            CenterArc((2 + FILLET2_R, FILLET2_R), FILLET2_R, 180, 90)
            Line((2, FILLET2_R), (2, 0))
            Line((2, 0), (2 + FILLET2_R, 0))
        make_face()
    revolve(axis=Axis((-48.720127664, 0, -10.706521739), (0, 1, 0)), mode=Mode.SUBTRACT)
    with BuildSketch(Plane(origin=(-48.720127664, 10, -10.706521739), x_dir=(0, 0, 1), z_dir=(-1, 0, 0))) as fillet2_piece_28:
        with BuildLine():
            CenterArc((2 + FILLET2_R, -FILLET2_R), FILLET2_R, 90, 90)
            Line((2, -FILLET2_R), (2, 0))
            Line((2, 0), (2 + FILLET2_R, 0))
        make_face()
    revolve(axis=Axis((-48.720127664, 10, -10.706521739), (0, 1, 0)), mode=Mode.SUBTRACT)
    with BuildSketch(Plane(origin=(-34.873115553, 10, -8.206521739), x_dir=(0, 0, -1), z_dir=(-1, 0, 0)), Plane(origin=(-2, 10, 0), x_dir=(0, 0, -1), z_dir=(-1, 0, 0))) as fillet2_piece_29:
        with BuildLine():
            CenterArc((FILLET2_R, FILLET2_R), FILLET2_R, 180, 90)
            Line((0, FILLET2_R), (0, 0))
            Line((0, 0), (FILLET2_R, 0))
        make_face()
    extrude(amount=14.847012111, mode=Mode.SUBTRACT)
    with BuildSketch(Plane(origin=(-34.873115553, 10, 1.793478261), x_dir=(0.5735764363510476, 0, -0.8191520442889908), z_dir=(0.8191520442889908, 0, 0.5735764363510476))) as fillet2_piece_30:
        with BuildLine():
            CenterArc((10 + FILLET2_R, -FILLET2_R), FILLET2_R, 90, 90)
            Line((10, -FILLET2_R), (10, 0))
            Line((10, 0), (10 + FILLET2_R, 0))
        make_face()
    revolve(axis=Axis((-34.873115553, 10, 1.793478261), (0, 1, 0)), revolution_arc=35, mode=Mode.SUBTRACT)


with BuildPart() as boss_extrude3_tool:
    # Sketch4 → Boss-Extrude3 (with draft: the straight prism first)
    with BuildSketch(Plane.XY):
        with Locations((-7.5, 5)):
            Circle(SKETCH4_R)
    extrude(amount=BOSS_EXTRUDE3_DEPTH)
    # Boss-Extrude3: the draft: its side faces are tilted about the plane it starts from
    boss_extrude3_sides = [boss_extrude3_tool.faces().sort_by_distance(p)[0] for p in [
        (-11.5, 5, 1.5),
    ]]
    draft(boss_extrude3_sides, Plane.XY, BOSS_EXTRUDE3_DRAFT)


with BuildPart() as part_1:
    add(part.part)

    # Boss-Extrude3: add boss_extrude3_tool
    add(boss_extrude3_tool.part)


with BuildPart() as body_2:
    # Sketch3 → Boss-Extrude2 (new body)
    with BuildSketch(Plane.XY.offset(3)):
        with Locations((-7.5, 5)):
            Circle(SKETCH3_R)
        with Locations((-7.5, 5)):
            Circle(SKETCH3_R_2, mode=Mode.SUBTRACT)
    extrude(amount=BOSS_EXTRUDE2_DEPTH)

    # Fillet4
    fillet4_edges = [body_2.edges().sort_by_distance(p)[0] for p in [
        (-17, 5, 9),
        (-15, 5, 9),
    ]]
    fillet(fillet4_edges, radius=FILLET4_R)


solid = Compound([part_1.part, body_2.part])
